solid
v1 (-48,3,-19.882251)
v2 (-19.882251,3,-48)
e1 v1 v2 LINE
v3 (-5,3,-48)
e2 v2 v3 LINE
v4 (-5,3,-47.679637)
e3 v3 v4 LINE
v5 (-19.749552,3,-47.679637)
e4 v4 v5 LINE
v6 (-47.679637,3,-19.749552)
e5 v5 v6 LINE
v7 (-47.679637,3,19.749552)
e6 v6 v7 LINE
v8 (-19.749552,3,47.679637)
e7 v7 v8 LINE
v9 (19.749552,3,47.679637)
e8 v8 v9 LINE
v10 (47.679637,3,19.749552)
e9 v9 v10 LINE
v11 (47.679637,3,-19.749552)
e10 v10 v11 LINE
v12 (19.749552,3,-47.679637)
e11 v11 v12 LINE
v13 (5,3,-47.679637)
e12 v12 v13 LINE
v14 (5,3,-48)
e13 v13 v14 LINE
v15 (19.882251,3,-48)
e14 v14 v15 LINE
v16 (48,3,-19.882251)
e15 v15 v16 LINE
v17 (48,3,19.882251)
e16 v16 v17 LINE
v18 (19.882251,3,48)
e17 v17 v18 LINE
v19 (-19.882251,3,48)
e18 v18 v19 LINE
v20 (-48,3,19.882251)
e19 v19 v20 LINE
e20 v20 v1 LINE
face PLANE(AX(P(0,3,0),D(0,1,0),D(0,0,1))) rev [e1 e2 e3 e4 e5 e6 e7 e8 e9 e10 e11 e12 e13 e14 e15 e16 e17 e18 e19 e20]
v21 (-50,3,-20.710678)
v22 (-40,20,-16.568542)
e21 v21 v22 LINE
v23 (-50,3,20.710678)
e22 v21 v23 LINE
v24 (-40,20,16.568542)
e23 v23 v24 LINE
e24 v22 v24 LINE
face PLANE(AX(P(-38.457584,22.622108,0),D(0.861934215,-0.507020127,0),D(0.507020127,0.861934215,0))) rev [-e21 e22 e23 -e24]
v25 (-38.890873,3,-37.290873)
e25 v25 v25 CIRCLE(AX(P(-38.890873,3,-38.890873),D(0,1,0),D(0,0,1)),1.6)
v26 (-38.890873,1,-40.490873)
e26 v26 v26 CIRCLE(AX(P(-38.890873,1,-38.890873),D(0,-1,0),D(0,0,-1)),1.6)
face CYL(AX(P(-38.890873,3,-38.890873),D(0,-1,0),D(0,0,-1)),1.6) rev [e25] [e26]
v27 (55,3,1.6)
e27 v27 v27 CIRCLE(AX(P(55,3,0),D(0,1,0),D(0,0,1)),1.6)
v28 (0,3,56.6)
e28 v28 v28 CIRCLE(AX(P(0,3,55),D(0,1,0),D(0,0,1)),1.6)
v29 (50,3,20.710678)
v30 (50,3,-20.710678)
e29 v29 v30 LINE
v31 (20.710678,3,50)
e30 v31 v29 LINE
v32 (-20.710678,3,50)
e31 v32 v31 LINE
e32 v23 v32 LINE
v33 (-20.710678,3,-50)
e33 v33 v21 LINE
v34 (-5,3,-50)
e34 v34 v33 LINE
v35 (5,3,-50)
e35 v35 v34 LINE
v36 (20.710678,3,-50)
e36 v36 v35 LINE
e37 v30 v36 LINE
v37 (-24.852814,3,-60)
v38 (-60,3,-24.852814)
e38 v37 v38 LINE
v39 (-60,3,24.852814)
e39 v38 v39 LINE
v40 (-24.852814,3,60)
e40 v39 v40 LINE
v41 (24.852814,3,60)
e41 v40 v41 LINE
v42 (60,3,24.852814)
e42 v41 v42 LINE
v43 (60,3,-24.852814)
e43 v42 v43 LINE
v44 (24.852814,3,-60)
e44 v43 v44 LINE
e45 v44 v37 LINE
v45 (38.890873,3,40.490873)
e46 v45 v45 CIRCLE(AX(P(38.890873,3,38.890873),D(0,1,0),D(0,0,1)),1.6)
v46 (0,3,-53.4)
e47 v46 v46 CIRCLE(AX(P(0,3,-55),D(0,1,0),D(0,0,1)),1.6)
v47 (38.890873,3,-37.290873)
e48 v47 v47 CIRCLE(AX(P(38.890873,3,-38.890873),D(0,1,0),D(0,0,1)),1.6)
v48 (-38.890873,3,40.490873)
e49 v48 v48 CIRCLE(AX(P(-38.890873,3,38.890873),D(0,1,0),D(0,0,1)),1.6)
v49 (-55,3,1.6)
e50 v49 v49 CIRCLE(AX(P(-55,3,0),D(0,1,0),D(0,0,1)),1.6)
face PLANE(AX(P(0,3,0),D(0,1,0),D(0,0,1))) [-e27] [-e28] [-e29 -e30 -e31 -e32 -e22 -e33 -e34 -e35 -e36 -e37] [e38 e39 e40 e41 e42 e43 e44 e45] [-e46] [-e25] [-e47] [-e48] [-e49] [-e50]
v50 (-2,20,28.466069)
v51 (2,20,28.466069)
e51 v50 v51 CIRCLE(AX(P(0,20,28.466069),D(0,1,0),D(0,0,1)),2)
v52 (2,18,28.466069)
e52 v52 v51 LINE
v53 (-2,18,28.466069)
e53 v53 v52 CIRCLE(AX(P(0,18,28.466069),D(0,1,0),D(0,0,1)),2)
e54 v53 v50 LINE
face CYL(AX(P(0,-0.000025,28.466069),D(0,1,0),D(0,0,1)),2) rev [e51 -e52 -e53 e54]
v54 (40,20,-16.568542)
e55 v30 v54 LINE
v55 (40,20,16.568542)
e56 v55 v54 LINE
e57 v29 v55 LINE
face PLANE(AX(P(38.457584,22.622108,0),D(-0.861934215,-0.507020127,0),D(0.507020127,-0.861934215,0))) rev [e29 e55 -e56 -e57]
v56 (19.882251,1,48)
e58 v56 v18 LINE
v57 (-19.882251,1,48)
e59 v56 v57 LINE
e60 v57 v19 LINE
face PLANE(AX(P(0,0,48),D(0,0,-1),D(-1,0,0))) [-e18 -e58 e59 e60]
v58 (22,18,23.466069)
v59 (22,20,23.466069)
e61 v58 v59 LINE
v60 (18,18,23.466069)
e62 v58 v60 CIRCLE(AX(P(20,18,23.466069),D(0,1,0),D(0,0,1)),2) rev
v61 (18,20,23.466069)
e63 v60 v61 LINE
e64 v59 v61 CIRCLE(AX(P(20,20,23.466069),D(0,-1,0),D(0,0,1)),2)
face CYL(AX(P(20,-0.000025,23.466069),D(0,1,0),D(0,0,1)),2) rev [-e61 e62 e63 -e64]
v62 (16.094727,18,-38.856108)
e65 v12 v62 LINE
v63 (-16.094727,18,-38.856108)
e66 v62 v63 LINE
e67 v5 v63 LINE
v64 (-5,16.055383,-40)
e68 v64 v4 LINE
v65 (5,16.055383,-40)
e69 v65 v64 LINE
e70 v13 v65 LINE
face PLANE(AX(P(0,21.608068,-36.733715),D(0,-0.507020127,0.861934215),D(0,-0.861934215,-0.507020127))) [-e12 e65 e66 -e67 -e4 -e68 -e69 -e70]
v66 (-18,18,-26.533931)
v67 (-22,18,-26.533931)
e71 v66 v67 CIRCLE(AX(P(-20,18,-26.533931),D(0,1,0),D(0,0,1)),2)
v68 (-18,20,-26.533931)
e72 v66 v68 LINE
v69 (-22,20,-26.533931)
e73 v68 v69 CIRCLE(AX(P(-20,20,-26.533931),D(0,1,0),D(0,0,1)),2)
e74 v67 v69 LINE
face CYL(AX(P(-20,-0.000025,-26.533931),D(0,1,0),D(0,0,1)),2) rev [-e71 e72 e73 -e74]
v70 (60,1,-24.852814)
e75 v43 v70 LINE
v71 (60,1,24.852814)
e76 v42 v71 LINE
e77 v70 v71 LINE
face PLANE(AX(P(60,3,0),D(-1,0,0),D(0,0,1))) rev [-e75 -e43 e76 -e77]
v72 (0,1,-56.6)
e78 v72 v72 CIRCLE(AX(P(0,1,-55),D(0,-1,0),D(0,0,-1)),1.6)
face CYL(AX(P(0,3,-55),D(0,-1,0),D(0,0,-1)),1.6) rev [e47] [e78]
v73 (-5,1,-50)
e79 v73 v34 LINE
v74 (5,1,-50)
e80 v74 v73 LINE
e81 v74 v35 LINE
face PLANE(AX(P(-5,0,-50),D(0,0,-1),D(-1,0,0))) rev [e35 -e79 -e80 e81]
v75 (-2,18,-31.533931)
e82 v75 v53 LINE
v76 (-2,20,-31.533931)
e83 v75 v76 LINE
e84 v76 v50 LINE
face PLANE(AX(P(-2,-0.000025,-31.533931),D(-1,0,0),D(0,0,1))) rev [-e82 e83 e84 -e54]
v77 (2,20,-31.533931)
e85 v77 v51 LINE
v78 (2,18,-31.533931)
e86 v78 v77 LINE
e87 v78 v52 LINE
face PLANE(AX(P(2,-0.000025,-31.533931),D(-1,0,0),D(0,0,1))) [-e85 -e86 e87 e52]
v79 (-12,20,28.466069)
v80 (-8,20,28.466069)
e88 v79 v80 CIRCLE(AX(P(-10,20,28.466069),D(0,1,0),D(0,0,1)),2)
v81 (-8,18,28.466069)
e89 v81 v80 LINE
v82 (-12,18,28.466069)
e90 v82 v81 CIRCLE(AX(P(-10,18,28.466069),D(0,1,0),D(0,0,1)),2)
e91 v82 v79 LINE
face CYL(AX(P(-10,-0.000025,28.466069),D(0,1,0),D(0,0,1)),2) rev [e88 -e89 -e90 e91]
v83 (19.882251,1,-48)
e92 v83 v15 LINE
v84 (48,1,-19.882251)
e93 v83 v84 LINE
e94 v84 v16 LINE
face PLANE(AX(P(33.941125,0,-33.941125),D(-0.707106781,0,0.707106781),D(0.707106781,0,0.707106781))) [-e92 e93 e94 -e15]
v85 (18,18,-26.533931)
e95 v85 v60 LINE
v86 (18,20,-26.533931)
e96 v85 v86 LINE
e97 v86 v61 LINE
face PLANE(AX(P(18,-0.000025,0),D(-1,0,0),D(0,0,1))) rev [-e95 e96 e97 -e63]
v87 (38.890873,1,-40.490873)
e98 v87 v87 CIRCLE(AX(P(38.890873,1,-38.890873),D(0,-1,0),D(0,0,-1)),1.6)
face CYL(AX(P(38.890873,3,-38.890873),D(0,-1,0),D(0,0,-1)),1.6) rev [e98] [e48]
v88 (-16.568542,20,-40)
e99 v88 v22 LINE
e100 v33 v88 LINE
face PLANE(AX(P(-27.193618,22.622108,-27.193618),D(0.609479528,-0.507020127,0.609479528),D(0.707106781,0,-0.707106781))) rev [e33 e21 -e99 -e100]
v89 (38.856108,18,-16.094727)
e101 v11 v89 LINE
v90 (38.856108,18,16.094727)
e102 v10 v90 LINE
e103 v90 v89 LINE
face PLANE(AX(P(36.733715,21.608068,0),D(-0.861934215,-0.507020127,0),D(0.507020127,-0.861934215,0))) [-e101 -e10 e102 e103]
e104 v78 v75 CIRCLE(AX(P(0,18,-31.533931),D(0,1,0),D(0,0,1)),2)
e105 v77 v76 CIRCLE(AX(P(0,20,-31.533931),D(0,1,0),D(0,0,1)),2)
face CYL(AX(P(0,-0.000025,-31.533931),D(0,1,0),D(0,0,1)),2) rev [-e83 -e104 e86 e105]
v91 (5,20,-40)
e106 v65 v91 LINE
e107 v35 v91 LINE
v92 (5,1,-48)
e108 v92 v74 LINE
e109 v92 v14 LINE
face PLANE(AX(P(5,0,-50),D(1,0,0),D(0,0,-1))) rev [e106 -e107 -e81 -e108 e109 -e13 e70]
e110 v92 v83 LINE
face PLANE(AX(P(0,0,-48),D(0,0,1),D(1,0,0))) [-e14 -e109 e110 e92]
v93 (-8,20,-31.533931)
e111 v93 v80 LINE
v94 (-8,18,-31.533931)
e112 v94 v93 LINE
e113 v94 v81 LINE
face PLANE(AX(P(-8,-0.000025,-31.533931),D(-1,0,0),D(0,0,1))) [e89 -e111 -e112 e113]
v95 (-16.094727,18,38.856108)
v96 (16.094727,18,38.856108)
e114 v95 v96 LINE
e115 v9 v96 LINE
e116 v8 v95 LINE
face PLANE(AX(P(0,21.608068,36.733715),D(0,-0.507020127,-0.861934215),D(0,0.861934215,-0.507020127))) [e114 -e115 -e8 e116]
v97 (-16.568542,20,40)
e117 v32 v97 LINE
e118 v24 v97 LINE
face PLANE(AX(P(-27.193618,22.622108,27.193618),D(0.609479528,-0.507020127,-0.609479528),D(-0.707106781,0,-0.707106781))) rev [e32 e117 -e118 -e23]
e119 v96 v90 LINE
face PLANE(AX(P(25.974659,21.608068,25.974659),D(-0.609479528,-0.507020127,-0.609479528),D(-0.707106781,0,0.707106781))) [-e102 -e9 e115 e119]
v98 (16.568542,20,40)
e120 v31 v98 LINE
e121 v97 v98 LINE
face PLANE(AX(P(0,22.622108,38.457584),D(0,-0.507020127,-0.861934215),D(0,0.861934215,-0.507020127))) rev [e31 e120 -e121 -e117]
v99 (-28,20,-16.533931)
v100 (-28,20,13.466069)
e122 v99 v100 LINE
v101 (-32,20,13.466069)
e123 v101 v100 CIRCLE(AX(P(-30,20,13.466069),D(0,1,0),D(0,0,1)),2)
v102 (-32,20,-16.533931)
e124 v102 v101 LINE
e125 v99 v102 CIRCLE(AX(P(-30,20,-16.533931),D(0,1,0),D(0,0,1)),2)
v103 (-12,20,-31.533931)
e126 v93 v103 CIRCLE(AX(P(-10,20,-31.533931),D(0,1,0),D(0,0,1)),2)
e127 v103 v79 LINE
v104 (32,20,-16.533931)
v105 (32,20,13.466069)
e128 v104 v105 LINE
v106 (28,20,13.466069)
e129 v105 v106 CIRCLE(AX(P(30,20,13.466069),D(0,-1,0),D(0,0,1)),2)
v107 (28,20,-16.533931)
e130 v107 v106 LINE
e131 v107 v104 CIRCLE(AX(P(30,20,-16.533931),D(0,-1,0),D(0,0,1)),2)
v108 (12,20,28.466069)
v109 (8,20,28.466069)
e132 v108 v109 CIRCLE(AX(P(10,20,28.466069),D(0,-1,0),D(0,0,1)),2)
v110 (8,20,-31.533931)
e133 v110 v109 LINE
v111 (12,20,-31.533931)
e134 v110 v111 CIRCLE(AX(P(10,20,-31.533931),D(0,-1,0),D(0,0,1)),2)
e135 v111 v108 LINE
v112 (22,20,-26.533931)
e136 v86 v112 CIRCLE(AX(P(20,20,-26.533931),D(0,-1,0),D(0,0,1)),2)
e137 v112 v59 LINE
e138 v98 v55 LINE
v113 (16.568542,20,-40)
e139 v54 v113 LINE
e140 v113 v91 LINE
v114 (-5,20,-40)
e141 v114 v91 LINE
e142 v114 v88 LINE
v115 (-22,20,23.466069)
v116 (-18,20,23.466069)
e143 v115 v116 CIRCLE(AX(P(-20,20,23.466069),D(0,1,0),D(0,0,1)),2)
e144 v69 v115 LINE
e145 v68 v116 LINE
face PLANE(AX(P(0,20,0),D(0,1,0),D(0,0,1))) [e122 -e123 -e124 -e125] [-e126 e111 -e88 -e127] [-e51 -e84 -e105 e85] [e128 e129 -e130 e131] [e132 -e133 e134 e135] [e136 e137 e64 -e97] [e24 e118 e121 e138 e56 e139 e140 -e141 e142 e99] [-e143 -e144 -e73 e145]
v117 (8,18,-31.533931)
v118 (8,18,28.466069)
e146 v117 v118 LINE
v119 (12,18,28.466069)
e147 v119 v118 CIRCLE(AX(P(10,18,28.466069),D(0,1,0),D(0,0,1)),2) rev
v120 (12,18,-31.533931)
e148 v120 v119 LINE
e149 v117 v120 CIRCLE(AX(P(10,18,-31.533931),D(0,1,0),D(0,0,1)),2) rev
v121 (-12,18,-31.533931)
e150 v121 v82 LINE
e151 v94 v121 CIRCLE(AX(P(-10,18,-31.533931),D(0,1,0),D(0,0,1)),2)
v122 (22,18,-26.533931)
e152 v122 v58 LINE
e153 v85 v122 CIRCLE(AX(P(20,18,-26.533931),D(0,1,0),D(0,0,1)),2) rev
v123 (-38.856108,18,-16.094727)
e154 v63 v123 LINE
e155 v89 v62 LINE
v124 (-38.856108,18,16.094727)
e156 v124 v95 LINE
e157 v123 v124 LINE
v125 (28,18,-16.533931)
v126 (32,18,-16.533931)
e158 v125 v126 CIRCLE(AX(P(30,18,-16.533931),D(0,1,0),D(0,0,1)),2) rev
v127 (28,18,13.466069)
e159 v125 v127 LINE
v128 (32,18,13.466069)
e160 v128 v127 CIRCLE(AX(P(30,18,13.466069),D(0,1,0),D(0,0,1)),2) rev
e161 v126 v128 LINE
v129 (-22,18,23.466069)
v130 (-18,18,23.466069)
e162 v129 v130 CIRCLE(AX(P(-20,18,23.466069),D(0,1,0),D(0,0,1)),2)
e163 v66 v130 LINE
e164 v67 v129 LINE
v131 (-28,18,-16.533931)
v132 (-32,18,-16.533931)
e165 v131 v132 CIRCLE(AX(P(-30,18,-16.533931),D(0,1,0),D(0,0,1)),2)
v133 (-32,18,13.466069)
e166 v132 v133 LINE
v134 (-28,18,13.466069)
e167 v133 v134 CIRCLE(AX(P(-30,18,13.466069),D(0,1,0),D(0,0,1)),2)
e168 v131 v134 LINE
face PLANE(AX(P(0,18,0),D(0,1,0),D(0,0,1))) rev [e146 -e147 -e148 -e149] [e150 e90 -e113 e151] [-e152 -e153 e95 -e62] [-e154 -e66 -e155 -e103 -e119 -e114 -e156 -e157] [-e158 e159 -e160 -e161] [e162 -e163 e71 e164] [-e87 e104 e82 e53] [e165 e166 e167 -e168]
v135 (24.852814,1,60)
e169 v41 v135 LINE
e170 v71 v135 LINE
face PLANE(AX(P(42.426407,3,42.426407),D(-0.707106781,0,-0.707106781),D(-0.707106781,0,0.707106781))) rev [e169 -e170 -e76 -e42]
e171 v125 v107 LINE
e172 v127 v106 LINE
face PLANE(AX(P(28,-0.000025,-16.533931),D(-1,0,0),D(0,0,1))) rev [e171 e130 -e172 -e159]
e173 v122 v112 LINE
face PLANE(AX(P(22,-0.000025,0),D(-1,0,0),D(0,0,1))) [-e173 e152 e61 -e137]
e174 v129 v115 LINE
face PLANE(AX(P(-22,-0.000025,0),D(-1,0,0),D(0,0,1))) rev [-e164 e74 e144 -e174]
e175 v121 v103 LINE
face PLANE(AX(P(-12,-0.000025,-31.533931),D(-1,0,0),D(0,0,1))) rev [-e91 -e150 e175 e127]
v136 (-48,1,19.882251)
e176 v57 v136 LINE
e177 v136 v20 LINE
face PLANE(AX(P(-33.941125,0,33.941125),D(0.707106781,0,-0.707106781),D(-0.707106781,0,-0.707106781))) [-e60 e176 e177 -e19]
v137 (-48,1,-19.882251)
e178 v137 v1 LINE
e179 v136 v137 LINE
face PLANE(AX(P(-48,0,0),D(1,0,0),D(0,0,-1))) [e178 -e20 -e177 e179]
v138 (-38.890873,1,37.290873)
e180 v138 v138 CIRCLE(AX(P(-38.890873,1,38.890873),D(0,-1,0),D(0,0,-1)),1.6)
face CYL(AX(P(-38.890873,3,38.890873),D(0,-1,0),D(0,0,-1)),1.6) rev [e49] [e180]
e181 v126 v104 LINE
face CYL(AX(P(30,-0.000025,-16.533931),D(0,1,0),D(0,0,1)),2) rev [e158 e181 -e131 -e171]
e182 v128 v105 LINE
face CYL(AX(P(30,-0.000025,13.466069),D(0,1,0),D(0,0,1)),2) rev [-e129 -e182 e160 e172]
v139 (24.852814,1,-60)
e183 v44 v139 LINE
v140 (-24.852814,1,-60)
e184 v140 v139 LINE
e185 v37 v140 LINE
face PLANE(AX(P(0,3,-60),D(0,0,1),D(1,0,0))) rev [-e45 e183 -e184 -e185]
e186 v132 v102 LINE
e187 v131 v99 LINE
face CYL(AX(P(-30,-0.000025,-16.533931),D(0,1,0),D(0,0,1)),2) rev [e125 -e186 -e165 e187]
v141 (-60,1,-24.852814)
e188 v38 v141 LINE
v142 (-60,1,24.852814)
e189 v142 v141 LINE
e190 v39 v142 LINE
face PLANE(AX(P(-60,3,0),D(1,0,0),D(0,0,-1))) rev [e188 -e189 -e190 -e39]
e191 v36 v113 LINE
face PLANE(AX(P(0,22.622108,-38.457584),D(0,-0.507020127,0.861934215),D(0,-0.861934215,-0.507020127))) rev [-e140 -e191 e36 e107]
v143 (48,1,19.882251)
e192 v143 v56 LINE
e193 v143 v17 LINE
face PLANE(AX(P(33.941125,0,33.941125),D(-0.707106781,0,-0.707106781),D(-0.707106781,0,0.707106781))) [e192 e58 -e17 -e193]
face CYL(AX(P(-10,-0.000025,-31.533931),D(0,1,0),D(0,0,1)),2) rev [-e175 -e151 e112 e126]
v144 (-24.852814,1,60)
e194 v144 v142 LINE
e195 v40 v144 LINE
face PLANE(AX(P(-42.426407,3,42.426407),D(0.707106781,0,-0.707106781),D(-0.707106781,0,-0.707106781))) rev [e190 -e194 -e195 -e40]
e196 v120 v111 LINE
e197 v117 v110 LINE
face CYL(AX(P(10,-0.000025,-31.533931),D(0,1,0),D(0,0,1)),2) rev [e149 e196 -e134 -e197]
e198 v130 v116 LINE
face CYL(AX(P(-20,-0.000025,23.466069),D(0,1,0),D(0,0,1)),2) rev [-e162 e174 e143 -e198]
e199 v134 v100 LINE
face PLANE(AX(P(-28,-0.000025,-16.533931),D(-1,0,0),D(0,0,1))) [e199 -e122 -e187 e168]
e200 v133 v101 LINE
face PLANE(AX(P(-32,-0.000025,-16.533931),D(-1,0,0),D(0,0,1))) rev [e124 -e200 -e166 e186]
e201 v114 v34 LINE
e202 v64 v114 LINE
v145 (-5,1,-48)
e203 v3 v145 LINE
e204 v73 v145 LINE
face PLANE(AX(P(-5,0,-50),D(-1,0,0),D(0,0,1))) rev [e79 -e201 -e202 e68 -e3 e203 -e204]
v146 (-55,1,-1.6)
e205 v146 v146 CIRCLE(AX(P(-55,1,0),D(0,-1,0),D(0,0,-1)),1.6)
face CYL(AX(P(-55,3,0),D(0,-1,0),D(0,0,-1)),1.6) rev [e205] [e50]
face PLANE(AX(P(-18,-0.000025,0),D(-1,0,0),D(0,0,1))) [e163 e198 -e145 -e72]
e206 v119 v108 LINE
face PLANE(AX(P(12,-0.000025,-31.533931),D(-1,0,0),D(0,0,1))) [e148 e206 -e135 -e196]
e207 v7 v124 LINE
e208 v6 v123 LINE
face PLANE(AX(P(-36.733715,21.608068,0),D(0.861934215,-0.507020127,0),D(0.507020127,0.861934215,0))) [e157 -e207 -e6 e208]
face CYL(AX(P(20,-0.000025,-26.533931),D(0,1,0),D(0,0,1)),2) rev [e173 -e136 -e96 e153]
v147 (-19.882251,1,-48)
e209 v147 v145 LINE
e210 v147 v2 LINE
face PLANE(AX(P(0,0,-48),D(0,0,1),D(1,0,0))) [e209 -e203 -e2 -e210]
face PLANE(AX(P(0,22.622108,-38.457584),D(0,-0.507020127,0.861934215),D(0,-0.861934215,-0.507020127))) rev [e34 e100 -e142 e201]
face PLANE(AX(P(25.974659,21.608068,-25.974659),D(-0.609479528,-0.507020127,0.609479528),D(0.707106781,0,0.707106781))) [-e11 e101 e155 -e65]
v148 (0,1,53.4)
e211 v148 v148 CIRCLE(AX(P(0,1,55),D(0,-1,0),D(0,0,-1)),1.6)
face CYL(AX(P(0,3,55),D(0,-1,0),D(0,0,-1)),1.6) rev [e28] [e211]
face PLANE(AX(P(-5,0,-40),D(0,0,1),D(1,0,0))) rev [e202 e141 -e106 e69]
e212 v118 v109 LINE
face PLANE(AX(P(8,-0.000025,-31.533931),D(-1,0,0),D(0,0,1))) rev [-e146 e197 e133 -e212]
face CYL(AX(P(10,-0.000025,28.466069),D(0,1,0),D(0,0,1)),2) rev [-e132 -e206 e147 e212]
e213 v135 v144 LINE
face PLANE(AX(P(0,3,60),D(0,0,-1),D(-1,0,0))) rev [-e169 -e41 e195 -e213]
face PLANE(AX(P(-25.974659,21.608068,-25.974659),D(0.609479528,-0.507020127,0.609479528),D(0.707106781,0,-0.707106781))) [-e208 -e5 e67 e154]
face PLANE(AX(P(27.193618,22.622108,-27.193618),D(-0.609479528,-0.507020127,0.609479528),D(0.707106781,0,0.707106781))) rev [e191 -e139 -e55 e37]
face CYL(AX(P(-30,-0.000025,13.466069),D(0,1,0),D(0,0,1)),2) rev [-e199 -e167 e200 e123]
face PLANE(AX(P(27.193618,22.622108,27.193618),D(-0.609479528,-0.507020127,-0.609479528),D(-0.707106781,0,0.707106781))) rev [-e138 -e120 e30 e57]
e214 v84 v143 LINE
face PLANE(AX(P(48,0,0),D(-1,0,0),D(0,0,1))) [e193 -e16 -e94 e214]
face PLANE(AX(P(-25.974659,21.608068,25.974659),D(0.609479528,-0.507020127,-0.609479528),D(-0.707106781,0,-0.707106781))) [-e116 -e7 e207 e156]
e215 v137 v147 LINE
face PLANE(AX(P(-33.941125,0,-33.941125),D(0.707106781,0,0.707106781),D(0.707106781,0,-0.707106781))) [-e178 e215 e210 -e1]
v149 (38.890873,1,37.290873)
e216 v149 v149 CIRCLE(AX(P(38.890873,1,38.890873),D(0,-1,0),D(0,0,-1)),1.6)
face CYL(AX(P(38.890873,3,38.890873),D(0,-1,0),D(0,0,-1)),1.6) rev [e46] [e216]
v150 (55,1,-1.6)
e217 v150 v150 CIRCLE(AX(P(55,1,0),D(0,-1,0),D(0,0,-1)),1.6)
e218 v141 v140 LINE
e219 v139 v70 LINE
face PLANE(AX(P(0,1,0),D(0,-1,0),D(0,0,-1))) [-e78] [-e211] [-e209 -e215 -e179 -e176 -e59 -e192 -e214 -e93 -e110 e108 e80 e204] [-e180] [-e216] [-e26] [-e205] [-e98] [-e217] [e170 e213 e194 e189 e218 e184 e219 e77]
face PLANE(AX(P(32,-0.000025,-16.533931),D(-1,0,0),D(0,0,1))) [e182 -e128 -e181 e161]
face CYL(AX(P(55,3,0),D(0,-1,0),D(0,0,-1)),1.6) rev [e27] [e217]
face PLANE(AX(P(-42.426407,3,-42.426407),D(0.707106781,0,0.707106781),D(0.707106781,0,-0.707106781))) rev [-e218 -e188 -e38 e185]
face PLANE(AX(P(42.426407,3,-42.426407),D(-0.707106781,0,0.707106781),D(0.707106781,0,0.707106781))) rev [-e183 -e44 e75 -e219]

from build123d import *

# Parameters (mm, degrees)
SKETCH1_R           = 1.6
BOSS_EXTRUDE1_DEPTH = 3
CUT_EXTRUDE1_DEPTH  = 85.905830189
BOSS_EXTRUDE2_DEPTH = 2
BOSS_EXTRUDE3_DEPTH = 3
SHELL1_DEPTH        = 15
SHELL1_DRAFT        = 30.4655449
SKETCH6_W           = 10
SKETCH6_H           = 10
CUT_EXTRUDE2_DEPTH  = 88.177978871
CUT_EXTRUDE3_DEPTH  = 88.177978894
SKETCH8_W           = 151.222151061
SKETCH8_H           = 131.165318394
CUT_EXTRUDE4_DEPTH  = 1


# Read off the part's stored shape, not the designer's step: Shell1
with BuildPart() as part:
    # Sketch1 → Boss-Extrude1 (new body)
    with BuildSketch(Plane(origin=(0, 0, 0), x_dir=(1, 0, 0), z_dir=(0, 1, 0))):
        Polygon((24.852813742, 60), (-24.852813742, 60), (-60, 24.852813742), (-60, -24.852813742), (-24.852813742, -60), (24.852813742, -60), (60, -24.852813742), (60, 24.852813742), align=None)
        with Locations(Location((-38.890872965, -38.890872965, 0), (0, 0, 270))):
            Circle(SKETCH1_R, mode=Mode.SUBTRACT)
        with Locations(Location((0, -55, 0), (0, 0, 270))):
            Circle(SKETCH1_R, mode=Mode.SUBTRACT)
        with Locations(Location((38.890872965, -38.890872965, 0), (0, 0, 270))):
            Circle(SKETCH1_R, mode=Mode.SUBTRACT)
        with Locations(Location((38.890872965, 38.890872965, 0), (0, 0, 270))):
            Circle(SKETCH1_R, mode=Mode.SUBTRACT)
        with Locations(Location((0, 55, 0), (0, 0, 270))):
            Circle(SKETCH1_R, mode=Mode.SUBTRACT)
        with Locations(Location((-38.890872965, 38.890872965, 0), (0, 0, 270))):
            Circle(SKETCH1_R, mode=Mode.SUBTRACT)
        with Locations(Location((55, 0, 0), (0, 0, 270))):
            Circle(SKETCH1_R, mode=Mode.SUBTRACT)
        with Locations(Location((-55, 0, 0), (0, 0, 270))):
            Circle(SKETCH1_R, mode=Mode.SUBTRACT)
    extrude(amount=BOSS_EXTRUDE1_DEPTH)

    # Sketch2 → Cut-Extrude1 (cut, through all)
    with BuildSketch(Plane(origin=(0, 3, 0), x_dir=(1, 0, 0), z_dir=(0, 1, 0))):
        Polygon((20.710678119, 50), (-20.710678119, 50), (-50, 20.710678119), (-50, -20.710678119), (-20.710678119, -50), (20.710678119, -50), (50, -20.710678119), (50, 20.710678119), align=None)
    extrude(amount=-CUT_EXTRUDE1_DEPTH, mode=Mode.SUBTRACT)



with BuildPart() as body_2:
    # Sketch3 → Boss-Extrude2 (new body)
    with BuildSketch(Plane(origin=(0, 18, 0), x_dir=(1, 0, 0), z_dir=(0, 1, 0))):
        Polygon((16.568542495, 40), (-16.568542495, 40), (-40, 16.568542495), (-40, -16.568542495), (-16.568542495, -40), (16.568542495, -40), (40, -16.568542495), (40, 16.568542495), align=None)
    extrude(amount=BOSS_EXTRUDE2_DEPTH)

    # Sketch2<2> → section 0 of loft1
    with BuildSketch(Plane(origin=(0, 3, 0), x_dir=(1, 0, 0), z_dir=(0, 1, 0)), mode=Mode.PRIVATE) as loft1_s0:
        with BuildLine():
            Line((20.710678119, 50), (-20.710678119, 50))
            Line((-20.710678119, 50), (-50, 20.710678119))
            Line((-50, 20.710678119), (-50, -20.710678119))
            Line((-50, -20.710678119), (-20.710678119, -50))
            Line((-20.710678119, -50), (20.710678119, -50))
            Line((20.710678119, -50), (50, -20.710678119))
            Line((50, -20.710678119), (50, 20.710678119))
            Line((50, 20.710678119), (20.710678119, 50))
        make_face()
    # loft up to a face of the part (loft1)
    loft([loft1_s0.sketch, body_2.faces().sort_by_distance((0, 20, 0))[0]])


with BuildPart() as part_1:
    add(part.part)

    add(body_2.part)  # Boss-Extrude3 merges body 2
    # Sketch5 → Boss-Extrude3 (add)
    with BuildSketch(Plane.XZ.offset(-3)):
        Polygon((-50, -20.710678119), (-20.710678119, -50), (20.710678119, -50), (50, -20.710678119), (50, 20.710678119), (20.710678119, 50), (-20.710678119, 50), (-50, 20.710678119), align=None)
        Polygon((48, -19.882250994), (19.882250994, -48), (-19.882250994, -48), (-48, -19.882250994), (-48, 19.882250994), (-19.882250994, 48), (19.882250994, 48), (48, 19.882250994), align=None, mode=Mode.SUBTRACT)
    extrude(amount=BOSS_EXTRUDE3_DEPTH)


with BuildPart() as shell1_tool:
    # Shell1 outline → Shell1 (with draft: the straight prism first)
    with BuildSketch(Plane(origin=(0, 18, 0), x_dir=(1, 0, 0), z_dir=(0, 1, 0))):
        Polygon((16.09472687, 38.856107891), (-16.09472687, 38.856107891), (-38.856107891, 16.09472687), (-38.856107891, -16.09472687), (-16.09472687, -38.856107891), (16.09472687, -38.856107891), (38.856107891, -16.09472687), (38.856107891, 16.09472687), align=None)
    extrude(amount=-SHELL1_DEPTH)
    # Shell1: the draft: its side faces are tilted about the plane it starts from
    shell1_sides = [shell1_tool.faces().sort_by_distance(p)[0] for p in [
        (0, 10.5, -38.856107891),
        (-27.475417381, 10.5, -27.47541738),
        (-38.856107891, 10.5, 0),
        (-27.47541738, 10.5, 27.475417381),
        (0, 10.5, 38.856107891),
        (27.475417381, 10.5, 27.47541738),
        (38.856107891, 10.5, 0),
        (27.47541738, 10.5, -27.475417381),
    ]]
    draft(shell1_sides, Plane(origin=(0, 18, 0), x_dir=(1, 0, 0), z_dir=(0, 1, 0)), SHELL1_DRAFT)


with BuildPart() as part_2:
    add(part_1.part)

    # Shell1: cut by shell1_tool
    add(shell1_tool.part, mode=Mode.SUBTRACT)

    # Sketch6 → Cut-Extrude2 (cut, through all)
    with BuildSketch(Plane(origin=(0, 20, 0), x_dir=(1, 0, 0), z_dir=(0, 1, 0))):
        with Locations((0, 45)):
            Rectangle(SKETCH6_W, SKETCH6_H)
    extrude(amount=-CUT_EXTRUDE2_DEPTH, mode=Mode.SUBTRACT)

    # Sketch7 → Cut-Extrude3 (cut, through all)
    with BuildSketch(Plane(origin=(0, 20, 0), x_dir=(1, 0, 0), z_dir=(0, 1, 0))):
        with BuildLine():
            Line((-22, 26.533930893), (-22, -23.466069107))
            ThreePointArc((-22, -23.466069107), (-20, -25.466069107), (-18, -23.466069107))
            Line((-18, -23.466069107), (-18, 26.533930893))
            ThreePointArc((-18, 26.533930893), (-20, 28.533930893), (-22, 26.533930893))
        make_face()
        with BuildLine():
            Line((-28, 16.533930893), (-28, -13.466069107))
            ThreePointArc((-28, -13.466069107), (-30, -15.466069107), (-32, -13.466069107))
            Line((-32, -13.466069107), (-32, 16.533930893))
            ThreePointArc((-32, 16.533930893), (-30, 18.533930893), (-28, 16.533930893))
        make_face()
        with BuildLine():
            Line((-8, 31.533930893), (-8, -28.466069107))
            ThreePointArc((-8, -28.466069107), (-10, -30.466069107), (-12, -28.466069107))
            Line((-12, -28.466069107), (-12, 31.533930893))
            ThreePointArc((-12, 31.533930893), (-10, 33.533930893), (-8, 31.533930893))
        make_face()
        with BuildLine():
            Line((2, 31.533930893), (2, -28.466069107))
            ThreePointArc((2, -28.466069107), (0, -30.466069107), (-2, -28.466069107))
            Line((-2, -28.466069107), (-2, 31.533930893))
            ThreePointArc((-2, 31.533930893), (0, 33.533930893), (2, 31.533930893))
        make_face()
    cut_extrude3 = extrude(amount=-CUT_EXTRUDE3_DEPTH, mode=Mode.SUBTRACT)

    # Mirror1: Cut-Extrude3 across plane
    add(cut_extrude3.mirror(Plane.ZY), mode=Mode.SUBTRACT)

    # Sketch8 → Cut-Extrude4 (cut)
    with BuildSketch(Plane.XZ):
        with Locations((-0.059380878, -1.432630905)):
            Rectangle(SKETCH8_W, SKETCH8_H)
    extrude(amount=-CUT_EXTRUDE4_DEPTH, mode=Mode.SUBTRACT)


solid = part_2.part
